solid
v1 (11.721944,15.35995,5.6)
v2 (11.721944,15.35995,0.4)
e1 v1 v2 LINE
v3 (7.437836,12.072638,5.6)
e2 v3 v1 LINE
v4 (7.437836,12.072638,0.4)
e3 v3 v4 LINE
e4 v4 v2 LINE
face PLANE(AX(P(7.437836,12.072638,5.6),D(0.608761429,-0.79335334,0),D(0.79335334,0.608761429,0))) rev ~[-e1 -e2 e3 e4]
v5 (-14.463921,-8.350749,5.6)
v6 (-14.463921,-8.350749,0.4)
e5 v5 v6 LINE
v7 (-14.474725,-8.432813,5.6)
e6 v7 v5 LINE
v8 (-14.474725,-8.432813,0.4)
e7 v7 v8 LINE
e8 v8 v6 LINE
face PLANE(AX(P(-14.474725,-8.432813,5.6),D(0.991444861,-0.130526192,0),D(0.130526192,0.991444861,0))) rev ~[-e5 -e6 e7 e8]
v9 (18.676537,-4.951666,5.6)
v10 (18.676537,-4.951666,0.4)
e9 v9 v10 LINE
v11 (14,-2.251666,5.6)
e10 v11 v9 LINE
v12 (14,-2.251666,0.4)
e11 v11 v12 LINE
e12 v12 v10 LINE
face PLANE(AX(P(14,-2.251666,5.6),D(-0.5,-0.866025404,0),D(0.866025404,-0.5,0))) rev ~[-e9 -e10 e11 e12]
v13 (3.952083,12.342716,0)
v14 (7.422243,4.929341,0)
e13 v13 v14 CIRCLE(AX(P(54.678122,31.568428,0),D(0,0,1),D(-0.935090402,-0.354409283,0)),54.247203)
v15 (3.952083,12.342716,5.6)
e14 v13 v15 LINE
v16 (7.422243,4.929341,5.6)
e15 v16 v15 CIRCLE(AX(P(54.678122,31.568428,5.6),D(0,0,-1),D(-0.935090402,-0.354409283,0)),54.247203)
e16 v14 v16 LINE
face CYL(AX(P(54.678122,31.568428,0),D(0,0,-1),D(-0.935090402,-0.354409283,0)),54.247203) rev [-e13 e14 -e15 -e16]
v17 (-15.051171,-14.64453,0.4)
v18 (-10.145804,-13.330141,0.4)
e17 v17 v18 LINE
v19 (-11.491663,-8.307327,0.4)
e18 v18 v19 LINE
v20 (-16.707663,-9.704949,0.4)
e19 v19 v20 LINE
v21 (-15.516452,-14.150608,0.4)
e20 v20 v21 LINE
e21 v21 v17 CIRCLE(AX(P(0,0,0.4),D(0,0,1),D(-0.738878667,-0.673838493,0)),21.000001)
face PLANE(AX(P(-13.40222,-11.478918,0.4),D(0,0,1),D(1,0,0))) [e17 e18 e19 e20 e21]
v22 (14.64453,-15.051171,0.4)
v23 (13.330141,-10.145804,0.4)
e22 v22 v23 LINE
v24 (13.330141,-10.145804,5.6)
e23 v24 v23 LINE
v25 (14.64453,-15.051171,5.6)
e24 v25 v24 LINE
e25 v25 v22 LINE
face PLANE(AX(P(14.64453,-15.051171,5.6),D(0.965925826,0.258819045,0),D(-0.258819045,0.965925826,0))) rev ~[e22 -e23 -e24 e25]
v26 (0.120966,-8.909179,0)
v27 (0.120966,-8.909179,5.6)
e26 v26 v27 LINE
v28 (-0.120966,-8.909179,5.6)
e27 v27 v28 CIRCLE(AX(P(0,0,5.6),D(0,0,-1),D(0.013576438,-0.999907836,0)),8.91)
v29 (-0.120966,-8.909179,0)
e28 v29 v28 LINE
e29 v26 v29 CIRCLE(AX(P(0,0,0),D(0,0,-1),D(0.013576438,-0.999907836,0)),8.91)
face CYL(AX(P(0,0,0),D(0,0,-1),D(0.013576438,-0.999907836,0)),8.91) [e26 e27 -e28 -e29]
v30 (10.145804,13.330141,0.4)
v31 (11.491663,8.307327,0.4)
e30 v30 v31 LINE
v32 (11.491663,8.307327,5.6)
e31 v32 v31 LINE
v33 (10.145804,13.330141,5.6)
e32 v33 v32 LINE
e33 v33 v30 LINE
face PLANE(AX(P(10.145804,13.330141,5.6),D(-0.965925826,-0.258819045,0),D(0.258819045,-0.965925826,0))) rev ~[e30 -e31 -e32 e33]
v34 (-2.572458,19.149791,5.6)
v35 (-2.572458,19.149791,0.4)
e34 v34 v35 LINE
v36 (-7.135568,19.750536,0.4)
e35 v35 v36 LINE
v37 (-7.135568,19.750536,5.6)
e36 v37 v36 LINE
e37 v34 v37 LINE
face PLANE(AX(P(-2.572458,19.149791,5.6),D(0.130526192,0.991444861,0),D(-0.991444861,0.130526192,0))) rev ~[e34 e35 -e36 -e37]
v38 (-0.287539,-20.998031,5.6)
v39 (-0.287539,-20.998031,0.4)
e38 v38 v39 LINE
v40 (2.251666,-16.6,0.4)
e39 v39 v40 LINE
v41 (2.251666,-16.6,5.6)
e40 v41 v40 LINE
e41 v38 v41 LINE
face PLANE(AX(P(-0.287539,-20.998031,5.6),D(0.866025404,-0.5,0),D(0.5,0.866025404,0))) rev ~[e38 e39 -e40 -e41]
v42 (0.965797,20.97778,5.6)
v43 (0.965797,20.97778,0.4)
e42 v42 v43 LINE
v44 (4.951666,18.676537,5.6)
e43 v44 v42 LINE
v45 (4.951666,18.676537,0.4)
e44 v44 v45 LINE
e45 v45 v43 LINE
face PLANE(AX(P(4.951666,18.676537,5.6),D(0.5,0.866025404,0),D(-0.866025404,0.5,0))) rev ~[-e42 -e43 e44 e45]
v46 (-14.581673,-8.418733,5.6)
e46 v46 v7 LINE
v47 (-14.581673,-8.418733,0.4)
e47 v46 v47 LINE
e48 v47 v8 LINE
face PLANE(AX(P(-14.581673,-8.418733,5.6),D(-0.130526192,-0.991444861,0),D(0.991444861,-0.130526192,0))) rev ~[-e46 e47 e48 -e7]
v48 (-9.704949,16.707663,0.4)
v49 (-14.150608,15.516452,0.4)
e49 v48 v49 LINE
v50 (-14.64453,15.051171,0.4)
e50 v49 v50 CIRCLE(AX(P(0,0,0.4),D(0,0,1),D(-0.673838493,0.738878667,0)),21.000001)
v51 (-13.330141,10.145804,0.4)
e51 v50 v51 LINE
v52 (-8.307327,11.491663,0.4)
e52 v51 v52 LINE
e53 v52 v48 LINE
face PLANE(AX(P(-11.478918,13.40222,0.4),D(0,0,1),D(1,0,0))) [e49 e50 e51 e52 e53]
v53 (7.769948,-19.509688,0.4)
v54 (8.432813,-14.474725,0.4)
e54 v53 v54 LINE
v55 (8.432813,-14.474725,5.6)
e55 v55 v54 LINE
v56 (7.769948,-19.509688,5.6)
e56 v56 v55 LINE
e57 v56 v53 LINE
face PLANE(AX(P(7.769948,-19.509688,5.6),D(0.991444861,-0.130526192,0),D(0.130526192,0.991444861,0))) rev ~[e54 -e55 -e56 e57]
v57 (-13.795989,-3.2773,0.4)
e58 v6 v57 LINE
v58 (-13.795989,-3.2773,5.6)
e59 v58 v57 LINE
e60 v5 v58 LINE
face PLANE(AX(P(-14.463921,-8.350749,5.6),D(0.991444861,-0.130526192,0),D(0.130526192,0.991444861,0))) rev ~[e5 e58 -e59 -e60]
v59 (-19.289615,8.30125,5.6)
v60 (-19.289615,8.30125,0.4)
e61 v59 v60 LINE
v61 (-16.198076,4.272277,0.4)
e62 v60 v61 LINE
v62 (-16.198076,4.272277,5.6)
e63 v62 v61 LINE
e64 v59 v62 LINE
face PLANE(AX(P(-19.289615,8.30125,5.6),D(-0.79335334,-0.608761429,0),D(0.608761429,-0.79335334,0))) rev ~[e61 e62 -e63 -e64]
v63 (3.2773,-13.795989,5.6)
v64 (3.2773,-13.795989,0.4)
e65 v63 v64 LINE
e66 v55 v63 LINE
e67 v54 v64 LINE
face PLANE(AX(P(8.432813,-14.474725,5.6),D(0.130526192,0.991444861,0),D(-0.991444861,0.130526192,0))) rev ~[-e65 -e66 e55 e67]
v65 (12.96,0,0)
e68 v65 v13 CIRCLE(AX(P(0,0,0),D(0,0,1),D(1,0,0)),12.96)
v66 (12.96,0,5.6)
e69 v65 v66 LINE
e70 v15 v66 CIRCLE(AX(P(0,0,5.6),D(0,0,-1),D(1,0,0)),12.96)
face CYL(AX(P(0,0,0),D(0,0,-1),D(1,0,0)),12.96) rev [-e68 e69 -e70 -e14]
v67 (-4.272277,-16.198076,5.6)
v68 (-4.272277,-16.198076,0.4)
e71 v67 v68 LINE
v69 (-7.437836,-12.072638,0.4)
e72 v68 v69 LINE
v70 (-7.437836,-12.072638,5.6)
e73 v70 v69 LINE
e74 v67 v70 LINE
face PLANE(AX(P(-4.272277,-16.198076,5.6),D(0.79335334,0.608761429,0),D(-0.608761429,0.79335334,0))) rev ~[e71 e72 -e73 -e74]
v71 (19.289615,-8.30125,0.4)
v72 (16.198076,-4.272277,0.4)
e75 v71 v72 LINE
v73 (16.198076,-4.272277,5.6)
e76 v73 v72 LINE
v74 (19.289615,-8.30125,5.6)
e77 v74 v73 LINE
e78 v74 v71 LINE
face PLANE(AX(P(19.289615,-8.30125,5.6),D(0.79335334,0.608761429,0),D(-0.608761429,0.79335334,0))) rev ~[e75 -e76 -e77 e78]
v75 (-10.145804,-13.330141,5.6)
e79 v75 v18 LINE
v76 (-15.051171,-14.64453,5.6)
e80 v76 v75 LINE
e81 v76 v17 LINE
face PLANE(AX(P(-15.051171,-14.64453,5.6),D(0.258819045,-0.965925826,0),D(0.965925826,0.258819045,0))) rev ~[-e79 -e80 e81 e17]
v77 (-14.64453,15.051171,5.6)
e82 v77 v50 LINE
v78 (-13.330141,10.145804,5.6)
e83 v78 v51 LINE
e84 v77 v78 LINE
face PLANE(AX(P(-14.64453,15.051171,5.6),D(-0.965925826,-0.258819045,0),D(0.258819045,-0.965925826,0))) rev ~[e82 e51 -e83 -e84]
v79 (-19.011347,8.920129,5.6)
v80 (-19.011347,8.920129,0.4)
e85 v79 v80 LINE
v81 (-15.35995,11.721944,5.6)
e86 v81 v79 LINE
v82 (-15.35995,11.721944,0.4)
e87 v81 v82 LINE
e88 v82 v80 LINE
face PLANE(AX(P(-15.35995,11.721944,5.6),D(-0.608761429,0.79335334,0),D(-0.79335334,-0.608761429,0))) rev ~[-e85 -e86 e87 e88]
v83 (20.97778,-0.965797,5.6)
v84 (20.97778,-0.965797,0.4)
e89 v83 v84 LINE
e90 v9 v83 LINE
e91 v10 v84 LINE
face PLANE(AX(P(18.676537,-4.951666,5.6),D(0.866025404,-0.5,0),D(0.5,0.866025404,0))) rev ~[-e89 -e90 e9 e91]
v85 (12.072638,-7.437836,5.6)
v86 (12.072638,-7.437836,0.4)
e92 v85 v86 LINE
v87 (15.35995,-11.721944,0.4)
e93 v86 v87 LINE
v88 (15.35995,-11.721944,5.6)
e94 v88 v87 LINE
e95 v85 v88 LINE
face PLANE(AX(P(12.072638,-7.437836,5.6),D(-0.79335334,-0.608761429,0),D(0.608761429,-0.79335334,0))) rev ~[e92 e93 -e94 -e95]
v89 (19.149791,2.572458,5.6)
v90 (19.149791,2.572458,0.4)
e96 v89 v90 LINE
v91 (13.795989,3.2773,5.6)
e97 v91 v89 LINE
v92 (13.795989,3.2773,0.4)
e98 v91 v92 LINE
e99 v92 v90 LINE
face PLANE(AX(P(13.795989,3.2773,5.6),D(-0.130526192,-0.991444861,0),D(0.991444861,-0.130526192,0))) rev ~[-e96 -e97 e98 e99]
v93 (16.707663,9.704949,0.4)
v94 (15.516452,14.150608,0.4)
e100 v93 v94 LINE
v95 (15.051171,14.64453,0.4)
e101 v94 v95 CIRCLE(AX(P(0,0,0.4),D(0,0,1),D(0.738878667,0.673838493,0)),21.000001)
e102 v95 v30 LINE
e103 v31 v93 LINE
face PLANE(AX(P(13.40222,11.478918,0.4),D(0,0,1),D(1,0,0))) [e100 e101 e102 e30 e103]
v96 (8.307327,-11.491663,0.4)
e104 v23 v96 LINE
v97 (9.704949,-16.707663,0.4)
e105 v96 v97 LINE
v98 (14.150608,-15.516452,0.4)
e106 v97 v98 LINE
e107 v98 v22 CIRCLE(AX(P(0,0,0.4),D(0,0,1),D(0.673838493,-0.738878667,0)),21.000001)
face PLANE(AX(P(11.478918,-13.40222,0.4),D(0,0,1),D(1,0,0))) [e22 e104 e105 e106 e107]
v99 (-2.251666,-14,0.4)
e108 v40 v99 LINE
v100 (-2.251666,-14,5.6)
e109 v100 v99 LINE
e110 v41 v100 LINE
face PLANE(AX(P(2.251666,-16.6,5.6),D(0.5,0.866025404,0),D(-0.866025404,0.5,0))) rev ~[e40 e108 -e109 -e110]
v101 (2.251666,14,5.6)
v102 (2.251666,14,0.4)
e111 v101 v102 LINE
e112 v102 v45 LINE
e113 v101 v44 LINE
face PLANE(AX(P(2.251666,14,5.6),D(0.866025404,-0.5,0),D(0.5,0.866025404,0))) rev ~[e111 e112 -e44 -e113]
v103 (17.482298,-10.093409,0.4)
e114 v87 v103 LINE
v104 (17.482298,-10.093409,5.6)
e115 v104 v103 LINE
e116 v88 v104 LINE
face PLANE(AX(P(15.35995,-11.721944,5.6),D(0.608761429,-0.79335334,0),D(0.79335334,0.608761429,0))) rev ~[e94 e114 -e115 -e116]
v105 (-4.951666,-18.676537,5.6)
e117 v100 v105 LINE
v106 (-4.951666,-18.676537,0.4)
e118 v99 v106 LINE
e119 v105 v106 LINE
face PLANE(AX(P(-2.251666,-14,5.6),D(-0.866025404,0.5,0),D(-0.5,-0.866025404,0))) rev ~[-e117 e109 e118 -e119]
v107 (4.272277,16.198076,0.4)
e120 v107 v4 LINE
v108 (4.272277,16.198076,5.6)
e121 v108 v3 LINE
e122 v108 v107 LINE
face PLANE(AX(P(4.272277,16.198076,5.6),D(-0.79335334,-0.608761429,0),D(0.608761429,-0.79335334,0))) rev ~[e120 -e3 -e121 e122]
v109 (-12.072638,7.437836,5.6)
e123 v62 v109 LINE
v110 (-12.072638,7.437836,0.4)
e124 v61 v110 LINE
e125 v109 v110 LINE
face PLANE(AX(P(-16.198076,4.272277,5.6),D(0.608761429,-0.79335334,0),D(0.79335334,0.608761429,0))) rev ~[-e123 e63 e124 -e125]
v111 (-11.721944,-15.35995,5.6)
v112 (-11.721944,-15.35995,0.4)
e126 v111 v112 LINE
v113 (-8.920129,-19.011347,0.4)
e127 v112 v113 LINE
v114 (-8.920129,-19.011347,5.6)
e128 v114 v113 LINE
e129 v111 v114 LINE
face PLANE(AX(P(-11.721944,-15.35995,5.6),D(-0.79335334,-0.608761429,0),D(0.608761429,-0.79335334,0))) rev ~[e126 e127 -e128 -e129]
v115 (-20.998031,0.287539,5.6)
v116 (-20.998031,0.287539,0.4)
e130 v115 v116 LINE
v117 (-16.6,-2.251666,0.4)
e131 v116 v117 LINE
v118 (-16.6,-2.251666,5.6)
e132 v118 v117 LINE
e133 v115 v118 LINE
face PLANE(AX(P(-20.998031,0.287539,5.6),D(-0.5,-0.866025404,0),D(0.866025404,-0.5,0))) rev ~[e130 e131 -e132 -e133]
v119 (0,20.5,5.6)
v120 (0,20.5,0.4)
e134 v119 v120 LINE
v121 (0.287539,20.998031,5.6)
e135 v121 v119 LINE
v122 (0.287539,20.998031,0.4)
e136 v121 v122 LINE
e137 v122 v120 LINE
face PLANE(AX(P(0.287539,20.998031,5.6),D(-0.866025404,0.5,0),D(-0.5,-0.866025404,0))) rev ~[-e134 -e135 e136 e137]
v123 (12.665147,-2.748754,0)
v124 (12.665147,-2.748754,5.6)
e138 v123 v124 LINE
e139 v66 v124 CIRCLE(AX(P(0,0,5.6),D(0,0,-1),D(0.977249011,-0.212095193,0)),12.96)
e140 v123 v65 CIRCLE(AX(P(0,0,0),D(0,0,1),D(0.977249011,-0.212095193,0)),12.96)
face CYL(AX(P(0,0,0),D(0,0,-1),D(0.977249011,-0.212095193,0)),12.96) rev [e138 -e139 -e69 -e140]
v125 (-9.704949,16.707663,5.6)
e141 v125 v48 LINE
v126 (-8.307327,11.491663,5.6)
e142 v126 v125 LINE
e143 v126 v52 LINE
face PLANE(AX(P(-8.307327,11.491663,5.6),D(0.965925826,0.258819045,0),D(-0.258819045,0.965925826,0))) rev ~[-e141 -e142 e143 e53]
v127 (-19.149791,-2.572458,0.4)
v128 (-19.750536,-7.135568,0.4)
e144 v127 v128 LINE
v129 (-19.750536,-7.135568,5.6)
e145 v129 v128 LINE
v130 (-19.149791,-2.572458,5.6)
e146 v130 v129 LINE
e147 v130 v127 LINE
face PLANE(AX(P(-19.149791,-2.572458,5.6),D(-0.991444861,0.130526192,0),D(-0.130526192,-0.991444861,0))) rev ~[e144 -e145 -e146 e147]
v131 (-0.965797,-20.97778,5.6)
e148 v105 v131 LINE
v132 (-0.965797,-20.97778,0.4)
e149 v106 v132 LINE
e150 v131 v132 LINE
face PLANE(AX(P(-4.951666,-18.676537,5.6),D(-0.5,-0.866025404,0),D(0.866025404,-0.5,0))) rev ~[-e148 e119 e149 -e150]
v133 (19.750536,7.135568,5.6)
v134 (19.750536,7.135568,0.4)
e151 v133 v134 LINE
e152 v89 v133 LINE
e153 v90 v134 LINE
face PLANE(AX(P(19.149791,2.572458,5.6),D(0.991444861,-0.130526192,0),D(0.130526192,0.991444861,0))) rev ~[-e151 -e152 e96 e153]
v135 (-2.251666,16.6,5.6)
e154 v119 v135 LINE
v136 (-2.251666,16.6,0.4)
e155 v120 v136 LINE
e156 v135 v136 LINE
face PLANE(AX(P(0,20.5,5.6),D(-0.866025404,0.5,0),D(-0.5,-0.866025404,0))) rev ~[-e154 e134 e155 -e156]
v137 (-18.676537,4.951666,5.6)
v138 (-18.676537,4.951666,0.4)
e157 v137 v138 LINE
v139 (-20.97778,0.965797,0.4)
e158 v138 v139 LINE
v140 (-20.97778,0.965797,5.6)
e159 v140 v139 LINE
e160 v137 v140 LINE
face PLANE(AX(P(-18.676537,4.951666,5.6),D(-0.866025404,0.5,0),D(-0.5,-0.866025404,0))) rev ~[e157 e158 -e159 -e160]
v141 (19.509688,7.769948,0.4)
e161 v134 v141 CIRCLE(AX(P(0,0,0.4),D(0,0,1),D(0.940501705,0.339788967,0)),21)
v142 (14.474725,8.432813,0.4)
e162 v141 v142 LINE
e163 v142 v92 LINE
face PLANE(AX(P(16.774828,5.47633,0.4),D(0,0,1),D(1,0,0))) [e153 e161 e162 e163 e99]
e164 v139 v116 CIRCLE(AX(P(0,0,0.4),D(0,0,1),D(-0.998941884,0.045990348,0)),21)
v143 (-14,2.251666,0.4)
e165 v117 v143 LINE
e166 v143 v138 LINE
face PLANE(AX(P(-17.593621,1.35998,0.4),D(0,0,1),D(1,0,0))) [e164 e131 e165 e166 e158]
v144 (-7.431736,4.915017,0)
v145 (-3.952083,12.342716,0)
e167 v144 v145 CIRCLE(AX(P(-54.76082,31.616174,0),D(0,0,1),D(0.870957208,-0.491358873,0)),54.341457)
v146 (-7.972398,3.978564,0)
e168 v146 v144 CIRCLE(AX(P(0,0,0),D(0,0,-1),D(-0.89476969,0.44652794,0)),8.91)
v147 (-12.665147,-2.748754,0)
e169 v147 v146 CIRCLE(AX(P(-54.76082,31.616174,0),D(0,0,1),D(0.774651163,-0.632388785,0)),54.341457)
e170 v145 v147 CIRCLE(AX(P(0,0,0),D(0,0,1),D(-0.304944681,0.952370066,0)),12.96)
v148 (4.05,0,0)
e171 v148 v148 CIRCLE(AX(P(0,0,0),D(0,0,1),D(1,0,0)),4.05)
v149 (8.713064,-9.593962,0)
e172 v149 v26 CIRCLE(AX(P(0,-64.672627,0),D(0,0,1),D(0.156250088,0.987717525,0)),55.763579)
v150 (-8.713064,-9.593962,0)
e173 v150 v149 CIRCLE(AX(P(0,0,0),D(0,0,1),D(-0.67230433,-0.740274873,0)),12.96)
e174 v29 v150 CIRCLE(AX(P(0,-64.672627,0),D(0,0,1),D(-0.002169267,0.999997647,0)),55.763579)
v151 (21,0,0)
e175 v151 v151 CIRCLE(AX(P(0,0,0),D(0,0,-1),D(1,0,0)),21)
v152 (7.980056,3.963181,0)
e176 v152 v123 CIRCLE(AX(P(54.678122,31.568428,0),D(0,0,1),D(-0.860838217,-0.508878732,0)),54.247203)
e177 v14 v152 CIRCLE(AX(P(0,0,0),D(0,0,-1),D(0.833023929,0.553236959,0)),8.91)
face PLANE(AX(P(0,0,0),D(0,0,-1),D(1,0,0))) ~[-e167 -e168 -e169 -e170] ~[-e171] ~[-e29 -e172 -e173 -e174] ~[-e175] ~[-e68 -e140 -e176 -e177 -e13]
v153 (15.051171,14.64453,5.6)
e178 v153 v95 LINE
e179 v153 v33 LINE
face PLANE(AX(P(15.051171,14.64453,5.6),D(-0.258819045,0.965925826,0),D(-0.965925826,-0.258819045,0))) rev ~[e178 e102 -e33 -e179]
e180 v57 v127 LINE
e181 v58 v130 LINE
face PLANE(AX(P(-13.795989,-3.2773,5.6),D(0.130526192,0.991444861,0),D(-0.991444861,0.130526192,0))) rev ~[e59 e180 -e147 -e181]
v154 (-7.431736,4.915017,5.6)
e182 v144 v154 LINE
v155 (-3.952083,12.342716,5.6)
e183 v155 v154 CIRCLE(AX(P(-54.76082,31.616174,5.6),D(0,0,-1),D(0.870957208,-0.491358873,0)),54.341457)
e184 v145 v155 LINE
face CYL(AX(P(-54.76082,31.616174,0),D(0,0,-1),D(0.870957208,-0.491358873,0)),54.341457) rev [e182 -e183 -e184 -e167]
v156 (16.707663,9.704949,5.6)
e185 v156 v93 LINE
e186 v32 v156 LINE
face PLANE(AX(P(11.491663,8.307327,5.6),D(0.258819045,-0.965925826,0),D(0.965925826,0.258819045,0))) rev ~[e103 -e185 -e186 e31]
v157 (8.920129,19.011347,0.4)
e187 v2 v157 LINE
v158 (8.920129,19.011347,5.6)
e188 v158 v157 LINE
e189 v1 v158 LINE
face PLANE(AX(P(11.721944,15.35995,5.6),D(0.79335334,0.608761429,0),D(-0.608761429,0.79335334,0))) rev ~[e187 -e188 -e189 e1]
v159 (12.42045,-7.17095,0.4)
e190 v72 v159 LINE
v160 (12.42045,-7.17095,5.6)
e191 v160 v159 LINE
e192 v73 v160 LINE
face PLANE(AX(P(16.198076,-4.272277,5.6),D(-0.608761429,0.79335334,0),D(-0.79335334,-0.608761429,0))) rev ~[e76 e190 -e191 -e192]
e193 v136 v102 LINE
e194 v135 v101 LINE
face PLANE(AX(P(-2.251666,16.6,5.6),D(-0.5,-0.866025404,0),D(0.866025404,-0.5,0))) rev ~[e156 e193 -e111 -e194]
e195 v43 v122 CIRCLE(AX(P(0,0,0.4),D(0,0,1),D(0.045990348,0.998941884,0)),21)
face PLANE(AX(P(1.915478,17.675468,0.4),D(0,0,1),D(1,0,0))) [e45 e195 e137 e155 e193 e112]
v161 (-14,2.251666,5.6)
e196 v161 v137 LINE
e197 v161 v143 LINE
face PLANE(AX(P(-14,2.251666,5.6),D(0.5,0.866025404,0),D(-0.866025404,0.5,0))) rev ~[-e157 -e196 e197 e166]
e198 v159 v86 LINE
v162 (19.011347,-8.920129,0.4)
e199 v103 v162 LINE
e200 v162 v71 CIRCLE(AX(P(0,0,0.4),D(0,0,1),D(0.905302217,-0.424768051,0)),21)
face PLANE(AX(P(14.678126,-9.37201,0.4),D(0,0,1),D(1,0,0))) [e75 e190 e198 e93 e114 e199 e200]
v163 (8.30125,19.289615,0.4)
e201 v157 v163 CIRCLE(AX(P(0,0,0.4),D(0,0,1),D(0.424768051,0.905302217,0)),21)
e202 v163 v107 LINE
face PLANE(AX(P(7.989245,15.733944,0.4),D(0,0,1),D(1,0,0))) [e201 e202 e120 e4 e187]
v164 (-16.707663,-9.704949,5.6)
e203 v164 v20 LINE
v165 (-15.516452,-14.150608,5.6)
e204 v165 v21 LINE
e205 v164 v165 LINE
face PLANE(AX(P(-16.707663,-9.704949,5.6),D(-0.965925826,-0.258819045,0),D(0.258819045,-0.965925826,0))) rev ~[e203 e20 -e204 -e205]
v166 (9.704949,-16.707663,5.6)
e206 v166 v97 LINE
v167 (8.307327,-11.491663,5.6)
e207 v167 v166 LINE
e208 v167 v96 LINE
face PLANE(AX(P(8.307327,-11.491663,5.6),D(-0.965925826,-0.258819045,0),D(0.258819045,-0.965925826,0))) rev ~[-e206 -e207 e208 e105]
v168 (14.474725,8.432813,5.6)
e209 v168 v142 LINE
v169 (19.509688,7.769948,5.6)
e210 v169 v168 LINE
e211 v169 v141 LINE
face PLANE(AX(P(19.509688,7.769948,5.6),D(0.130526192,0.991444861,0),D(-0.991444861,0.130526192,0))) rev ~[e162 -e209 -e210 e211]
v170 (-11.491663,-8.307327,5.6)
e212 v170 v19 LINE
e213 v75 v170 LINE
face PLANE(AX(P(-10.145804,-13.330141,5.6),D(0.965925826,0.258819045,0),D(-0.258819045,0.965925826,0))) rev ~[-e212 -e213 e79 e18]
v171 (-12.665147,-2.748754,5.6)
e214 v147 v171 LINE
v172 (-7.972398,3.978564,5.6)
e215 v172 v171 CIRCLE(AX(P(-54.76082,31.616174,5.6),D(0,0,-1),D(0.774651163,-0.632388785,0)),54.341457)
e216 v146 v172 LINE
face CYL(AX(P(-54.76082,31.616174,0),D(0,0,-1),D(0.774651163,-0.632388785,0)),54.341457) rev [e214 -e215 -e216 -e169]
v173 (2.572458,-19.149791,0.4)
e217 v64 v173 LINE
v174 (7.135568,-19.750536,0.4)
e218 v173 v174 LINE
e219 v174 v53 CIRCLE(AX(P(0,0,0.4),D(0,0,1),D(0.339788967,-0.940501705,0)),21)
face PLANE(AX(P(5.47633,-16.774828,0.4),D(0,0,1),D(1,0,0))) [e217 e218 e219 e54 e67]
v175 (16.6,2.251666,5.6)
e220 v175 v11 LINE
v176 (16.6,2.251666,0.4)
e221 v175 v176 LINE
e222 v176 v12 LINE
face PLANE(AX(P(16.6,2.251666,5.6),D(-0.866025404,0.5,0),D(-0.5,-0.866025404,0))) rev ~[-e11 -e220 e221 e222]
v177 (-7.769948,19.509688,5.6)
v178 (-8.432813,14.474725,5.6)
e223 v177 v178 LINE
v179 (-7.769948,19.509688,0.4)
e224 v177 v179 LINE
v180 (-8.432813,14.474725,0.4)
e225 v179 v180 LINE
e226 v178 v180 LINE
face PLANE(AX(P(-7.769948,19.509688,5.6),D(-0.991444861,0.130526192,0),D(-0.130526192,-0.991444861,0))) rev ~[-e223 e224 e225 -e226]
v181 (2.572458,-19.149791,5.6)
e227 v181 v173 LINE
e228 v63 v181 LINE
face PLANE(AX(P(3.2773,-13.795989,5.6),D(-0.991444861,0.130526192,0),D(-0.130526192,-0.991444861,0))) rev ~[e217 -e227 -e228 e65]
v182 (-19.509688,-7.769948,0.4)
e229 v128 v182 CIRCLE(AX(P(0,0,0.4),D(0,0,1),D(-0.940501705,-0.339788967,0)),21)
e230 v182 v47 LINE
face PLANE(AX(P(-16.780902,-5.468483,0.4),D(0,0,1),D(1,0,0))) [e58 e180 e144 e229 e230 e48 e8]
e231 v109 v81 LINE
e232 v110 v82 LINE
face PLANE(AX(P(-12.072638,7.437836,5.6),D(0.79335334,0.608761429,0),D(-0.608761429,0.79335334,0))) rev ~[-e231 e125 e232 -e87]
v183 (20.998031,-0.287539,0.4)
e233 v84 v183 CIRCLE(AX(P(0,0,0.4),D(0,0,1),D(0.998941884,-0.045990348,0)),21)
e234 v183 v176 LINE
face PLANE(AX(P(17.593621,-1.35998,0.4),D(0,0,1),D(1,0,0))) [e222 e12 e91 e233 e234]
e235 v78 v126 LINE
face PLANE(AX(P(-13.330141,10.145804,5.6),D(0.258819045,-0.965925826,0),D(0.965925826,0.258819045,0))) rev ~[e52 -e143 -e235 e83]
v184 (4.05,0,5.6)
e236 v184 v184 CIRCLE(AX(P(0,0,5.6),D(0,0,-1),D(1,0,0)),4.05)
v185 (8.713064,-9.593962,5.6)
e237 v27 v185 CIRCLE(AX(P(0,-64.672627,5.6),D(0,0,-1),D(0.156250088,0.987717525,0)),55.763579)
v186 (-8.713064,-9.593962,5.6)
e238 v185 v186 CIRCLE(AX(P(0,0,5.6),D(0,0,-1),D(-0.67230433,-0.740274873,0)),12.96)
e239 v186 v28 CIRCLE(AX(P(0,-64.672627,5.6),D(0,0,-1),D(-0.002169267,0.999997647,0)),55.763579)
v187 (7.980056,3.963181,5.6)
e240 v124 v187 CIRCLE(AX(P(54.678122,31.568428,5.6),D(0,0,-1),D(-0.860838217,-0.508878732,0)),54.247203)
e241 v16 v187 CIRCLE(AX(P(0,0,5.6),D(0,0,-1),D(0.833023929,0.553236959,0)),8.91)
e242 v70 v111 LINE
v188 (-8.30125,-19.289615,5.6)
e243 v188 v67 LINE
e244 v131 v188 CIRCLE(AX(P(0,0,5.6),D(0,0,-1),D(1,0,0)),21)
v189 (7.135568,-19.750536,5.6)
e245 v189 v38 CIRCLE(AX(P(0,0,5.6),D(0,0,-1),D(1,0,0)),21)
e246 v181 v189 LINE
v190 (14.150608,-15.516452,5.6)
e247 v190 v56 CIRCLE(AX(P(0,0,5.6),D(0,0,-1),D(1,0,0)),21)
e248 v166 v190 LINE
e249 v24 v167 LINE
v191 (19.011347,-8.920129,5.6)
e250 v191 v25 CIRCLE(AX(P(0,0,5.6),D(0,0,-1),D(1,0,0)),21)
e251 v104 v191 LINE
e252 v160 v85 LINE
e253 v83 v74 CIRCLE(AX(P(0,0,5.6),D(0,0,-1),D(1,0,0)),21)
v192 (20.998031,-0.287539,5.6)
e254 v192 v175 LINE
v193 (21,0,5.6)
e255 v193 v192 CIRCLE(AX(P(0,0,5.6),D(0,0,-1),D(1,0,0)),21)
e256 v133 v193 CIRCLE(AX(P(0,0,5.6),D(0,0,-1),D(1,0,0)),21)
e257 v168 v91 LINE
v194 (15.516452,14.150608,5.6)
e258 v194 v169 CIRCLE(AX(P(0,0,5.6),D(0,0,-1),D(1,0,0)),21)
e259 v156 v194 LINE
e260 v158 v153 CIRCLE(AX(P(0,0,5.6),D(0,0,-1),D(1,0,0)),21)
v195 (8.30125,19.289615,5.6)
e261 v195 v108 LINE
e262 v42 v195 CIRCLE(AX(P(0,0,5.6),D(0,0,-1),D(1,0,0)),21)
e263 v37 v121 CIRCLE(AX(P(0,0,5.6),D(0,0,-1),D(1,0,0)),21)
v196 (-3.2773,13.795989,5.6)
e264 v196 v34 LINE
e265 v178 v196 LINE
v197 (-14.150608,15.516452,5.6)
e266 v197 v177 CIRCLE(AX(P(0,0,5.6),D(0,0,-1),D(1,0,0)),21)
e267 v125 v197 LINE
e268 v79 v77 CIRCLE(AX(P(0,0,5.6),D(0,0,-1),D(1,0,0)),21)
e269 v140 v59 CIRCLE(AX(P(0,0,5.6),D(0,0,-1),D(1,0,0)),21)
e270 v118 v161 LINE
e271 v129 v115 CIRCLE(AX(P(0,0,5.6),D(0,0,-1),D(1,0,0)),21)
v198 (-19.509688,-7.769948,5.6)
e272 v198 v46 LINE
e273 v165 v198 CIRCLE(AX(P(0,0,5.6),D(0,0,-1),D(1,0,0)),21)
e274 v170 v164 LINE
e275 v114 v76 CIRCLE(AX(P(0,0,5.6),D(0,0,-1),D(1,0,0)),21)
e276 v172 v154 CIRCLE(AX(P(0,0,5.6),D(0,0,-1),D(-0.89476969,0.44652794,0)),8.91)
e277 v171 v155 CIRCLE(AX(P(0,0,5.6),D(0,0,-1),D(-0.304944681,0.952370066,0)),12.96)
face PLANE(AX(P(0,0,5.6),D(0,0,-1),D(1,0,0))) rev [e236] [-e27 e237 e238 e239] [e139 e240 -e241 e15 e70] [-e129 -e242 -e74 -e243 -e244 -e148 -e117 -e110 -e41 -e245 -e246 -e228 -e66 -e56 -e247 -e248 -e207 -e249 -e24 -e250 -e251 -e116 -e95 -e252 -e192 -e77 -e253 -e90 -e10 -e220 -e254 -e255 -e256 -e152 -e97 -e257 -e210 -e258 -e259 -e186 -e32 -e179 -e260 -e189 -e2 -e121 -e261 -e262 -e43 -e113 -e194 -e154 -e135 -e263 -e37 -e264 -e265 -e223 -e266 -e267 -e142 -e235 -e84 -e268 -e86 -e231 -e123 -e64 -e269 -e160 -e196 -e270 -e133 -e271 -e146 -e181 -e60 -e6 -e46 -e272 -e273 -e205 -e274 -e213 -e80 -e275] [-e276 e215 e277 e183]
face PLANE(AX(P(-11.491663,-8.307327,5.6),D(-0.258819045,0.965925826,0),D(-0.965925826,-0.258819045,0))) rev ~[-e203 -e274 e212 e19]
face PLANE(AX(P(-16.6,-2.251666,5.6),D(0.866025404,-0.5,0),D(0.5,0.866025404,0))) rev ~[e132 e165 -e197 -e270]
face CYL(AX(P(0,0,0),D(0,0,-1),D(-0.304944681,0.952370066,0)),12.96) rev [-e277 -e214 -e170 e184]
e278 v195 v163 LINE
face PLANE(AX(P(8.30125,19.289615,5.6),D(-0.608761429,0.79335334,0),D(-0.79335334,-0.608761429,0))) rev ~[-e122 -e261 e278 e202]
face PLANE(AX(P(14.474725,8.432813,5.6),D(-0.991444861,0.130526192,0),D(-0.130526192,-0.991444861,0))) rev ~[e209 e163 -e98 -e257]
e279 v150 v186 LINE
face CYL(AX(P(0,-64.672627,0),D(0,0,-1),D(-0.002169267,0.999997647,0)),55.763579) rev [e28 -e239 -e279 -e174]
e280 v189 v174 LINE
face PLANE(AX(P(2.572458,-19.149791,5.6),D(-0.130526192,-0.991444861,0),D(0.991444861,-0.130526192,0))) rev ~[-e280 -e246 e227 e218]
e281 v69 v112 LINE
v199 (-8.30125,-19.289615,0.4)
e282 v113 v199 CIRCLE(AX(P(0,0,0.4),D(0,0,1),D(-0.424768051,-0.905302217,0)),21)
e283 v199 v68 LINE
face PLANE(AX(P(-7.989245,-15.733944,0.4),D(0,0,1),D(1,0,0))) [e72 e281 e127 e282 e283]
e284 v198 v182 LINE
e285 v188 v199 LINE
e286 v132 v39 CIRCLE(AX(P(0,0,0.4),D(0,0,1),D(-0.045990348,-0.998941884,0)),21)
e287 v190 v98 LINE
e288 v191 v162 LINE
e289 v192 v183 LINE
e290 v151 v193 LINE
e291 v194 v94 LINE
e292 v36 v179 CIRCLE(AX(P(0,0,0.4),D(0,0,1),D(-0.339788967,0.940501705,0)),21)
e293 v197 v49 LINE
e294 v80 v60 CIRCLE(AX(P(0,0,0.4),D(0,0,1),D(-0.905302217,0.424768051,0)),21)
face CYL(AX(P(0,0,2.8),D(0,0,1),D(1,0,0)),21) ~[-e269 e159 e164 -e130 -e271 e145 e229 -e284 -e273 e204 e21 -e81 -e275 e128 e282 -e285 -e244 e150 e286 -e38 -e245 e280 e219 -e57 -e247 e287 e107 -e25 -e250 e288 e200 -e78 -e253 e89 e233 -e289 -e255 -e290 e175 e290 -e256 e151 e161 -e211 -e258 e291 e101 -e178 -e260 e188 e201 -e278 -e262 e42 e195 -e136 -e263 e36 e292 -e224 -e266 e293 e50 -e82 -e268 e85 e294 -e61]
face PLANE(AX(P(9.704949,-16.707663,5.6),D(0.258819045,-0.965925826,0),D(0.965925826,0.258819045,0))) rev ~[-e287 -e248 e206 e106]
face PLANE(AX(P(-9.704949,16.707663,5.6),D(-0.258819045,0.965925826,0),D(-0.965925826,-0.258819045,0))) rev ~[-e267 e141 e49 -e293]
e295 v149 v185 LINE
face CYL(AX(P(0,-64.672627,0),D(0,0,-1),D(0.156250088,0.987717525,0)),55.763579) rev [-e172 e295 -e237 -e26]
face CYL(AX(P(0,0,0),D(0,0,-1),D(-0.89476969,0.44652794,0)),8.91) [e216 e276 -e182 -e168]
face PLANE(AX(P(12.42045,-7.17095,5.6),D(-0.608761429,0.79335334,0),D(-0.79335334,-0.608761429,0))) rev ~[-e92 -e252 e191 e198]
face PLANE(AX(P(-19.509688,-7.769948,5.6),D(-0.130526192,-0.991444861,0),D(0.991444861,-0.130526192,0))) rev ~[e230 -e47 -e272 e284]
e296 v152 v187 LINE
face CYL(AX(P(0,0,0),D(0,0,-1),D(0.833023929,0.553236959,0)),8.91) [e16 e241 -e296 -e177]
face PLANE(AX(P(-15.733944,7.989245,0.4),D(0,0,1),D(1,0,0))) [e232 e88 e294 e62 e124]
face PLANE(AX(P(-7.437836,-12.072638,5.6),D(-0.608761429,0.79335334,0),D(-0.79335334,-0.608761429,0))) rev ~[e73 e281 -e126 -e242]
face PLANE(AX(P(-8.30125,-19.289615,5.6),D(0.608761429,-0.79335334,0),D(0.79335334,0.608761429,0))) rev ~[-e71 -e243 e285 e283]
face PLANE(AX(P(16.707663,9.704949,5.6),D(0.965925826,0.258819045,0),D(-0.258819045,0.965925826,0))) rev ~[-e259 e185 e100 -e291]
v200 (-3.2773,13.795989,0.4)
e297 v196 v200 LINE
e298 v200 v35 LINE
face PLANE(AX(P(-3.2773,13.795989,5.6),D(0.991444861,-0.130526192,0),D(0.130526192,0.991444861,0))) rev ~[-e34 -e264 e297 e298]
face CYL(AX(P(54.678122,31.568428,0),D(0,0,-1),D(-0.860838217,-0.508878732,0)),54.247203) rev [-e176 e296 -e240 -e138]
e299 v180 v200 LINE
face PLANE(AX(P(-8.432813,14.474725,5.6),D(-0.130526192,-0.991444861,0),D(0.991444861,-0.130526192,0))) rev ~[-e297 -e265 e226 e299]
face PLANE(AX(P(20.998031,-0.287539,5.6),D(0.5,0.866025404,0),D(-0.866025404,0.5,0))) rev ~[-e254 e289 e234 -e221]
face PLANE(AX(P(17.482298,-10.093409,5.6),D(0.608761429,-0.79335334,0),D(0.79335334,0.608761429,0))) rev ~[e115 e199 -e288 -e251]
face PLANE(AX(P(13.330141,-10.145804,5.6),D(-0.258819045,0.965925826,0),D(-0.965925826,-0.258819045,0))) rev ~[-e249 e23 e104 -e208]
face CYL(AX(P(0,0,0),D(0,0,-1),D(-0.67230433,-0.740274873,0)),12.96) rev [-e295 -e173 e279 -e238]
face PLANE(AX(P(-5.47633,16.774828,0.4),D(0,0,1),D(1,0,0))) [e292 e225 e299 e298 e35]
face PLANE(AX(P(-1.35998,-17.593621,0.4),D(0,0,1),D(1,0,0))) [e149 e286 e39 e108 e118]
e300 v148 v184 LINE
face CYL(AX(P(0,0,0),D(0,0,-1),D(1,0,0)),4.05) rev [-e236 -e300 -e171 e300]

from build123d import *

# Parameters (mm, degrees)
F0_W     = 21
F0_H     = 5.6
F2_R     = 4.05
F3_DEPTH = 25
F5_DEPTH = 5.2


# Not quite as in the source:
# - a feature names something its author has since deleted; it is built from what else it names


with BuildPart() as f1:
    # F0 (on Front) → F1 (revolve)
    with BuildSketch(Plane.XZ):
        with Locations((10.5, 2.8)):
            Rectangle(F0_W, F0_H)
    revolve(axis=Axis((0, 0, 2.8), (0, 0, -1)))

    # F2 (on Top) → F3 (cut)
    with BuildSketch(Plane.XY):
        with BuildLine():
            ThreePointArc((7.42224321, 4.929341308), (7.7162863477, 4.455), (7.9800564017, 3.963180519))
            ThreePointArc((7.9800564017, 3.963180519), (10.1958256536, 0.5187206321), (12.6651471812, -2.7487536956))
            ThreePointArc((12.6651471812, -2.7487536956), (12.8860759634, -1.3822612872), (12.96, 0))
            ThreePointArc((12.96, 0), (10.4685384958, 7.640111371), (3.9520830614, 12.3427160494))
            ThreePointArc((3.9520830614, 12.3427160494), (5.5471380717, 8.5704837125), (7.42224321, 4.929341308))
        make_face()
        with BuildLine():
            ThreePointArc((8.7130641198, -9.5939623537), (4.4302657319, -9.0853125174), (0.1209660663, -8.909178818))
            ThreePointArc((0.1209660663, -8.909178818), (0, -8.91), (-0.1209660663, -8.909178818))
            ThreePointArc((-0.1209660663, -8.909178818), (-4.4302657319, -9.0853125174), (-8.7130641198, -9.5939623537))
            ThreePointArc((-8.7130641198, -9.5939623537), (0, -12.96), (8.7130641198, -9.5939623537))
        make_face()
        with BuildLine():
            ThreePointArc((-7.9723979418, 3.9785639441), (-7.7162863477, 4.455), (-7.4317364171, 4.9150171746))
            ThreePointArc((-7.4317364171, 4.9150171746), (-5.551566481, 8.5631200197), (-3.9520830614, 12.3427160494))
            ThreePointArc((-3.9520830614, 12.3427160494), (-11.223689233, 6.48), (-12.6651471812, -2.7487536956))
            ThreePointArc((-12.6651471812, -2.7487536956), (-10.1916627132, 0.5262375935), (-7.9723979418, 3.9785639441))
        make_face()
        Circle(F2_R)
    extrude(amount=F3_DEPTH, mode=Mode.SUBTRACT)

    # F4 (on face) → F5 (cut)
    with BuildSketch(Plane.XY.offset(5.6)):
        with BuildLine():
            Line((0, 15.3), (2.2516660498, 14))
            Line((2.2516660498, 14), (4.9516660498, 18.6765371804))
            Line((4.9516660498, 18.6765371804), (0.9657973165, 20.9777795666))
            ThreePointArc((0.9657973165, 20.9777795666), (0.6267497357, 20.9906451728), (0.2875385478, 20.998031374))
            Line((0.2875385478, 20.998031374), (0, 20.5))
            Line((0, 20.5), (0, 15.7))
            Line((0, 15.7), (0, 15.3))
        make_face()
        Polygon((-2.2516660498, 16.6), (0, 15.3), (0, 15.7), (0, 20.5), align=None)
        with BuildLine():
            ThreePointArc((8.9201290612, 19.011346547), (8.6118133951, 19.1529807092), (8.3012496983, 19.289615171))
            Line((8.3012496983, 19.289615171), (4.2722767998, 16.1980755322))
            Line((4.2722767998, 16.1980755322), (7.4378362306, 12.0726381627))
            Line((7.4378362306, 12.0726381627), (11.7219442682, 15.3599498793))
            Line((11.7219442682, 15.3599498793), (8.9201290612, 19.011346547))
        make_face()
        with BuildLine():
            ThreePointArc((15.5164520175, 14.150608354), (15.2858065313, 14.3994485549), (15.0511708332, 14.6445299191))
            Line((15.0511708332, 14.6445299191), (10.1458042349, 13.3301409005))
            Line((10.1458042349, 13.3301409005), (11.4916632694, 8.3073266038))
            Line((11.4916632694, 8.3073266038), (16.7076627314, 9.7049494474))
            Line((16.7076627314, 9.7049494474), (15.5164520175, 14.150608354))
        make_face()
        with BuildLine():
            ThreePointArc((19.7505358111, 7.1355683146), (19.6326741894, 7.4537308895), (19.5096876479, 7.76994774))
            Line((19.5096876479, 7.76994774), (14.4747249472, 8.4328131548))
            Line((14.4747249472, 8.4328131548), (13.7959887477, 3.2772998756))
            Line((13.7959887477, 3.2772998756), (19.1497909991, 2.5724584376))
            Line((19.1497909991, 2.5724584376), (19.7505358111, 7.1355683146))
        make_face()
        with BuildLine():
            Line((18.6765371804, -4.9516660498), (20.9777795666, -0.9657973165))
            ThreePointArc((20.9777795666, -0.9657973165), (20.9906451728, -0.6267497357), (20.998031374, -0.2875385478))
            Line((20.998031374, -0.2875385478), (16.6, 2.2516660498))
            Line((16.6, 2.2516660498), (14, -2.2516660498))
            Line((14, -2.2516660498), (18.6765371804, -4.9516660498))
        make_face()
        Polygon((17.4822978668, -10.0934093795), (12.4204504984, -7.1709504387), (12.0726381627, -7.4378362306), (15.3599498793, -11.7219442682), align=None)
        with BuildLine():
            ThreePointArc((14.150608354, -15.5164520175), (14.3994485549, -15.2858065313), (14.6445299191, -15.0511708332))
            Line((14.6445299191, -15.0511708332), (13.3301409005, -10.1458042349))
            Line((13.3301409005, -10.1458042349), (8.3073266038, -11.4916632694))
            Line((8.3073266038, -11.4916632694), (9.7049494474, -16.7076627314))
            Line((9.7049494474, -16.7076627314), (14.150608354, -15.5164520175))
        make_face()
        with BuildLine():
            ThreePointArc((7.1355683146, -19.7505358111), (7.4537308895, -19.6326741894), (7.76994774, -19.5096876479))
            Line((7.76994774, -19.5096876479), (8.4328131548, -14.4747249472))
            Line((8.4328131548, -14.4747249472), (3.2772998756, -13.7959887477))
            Line((3.2772998756, -13.7959887477), (2.5724584376, -19.1497909991))
            Line((2.5724584376, -19.1497909991), (7.1355683146, -19.7505358111))
        make_face()
        with BuildLine():
            Line((-4.9516660498, -18.6765371804), (-0.9657973165, -20.9777795666))
            ThreePointArc((-0.9657973165, -20.9777795666), (-0.6267497357, -20.9906451728), (-0.2875385478, -20.998031374))
            Line((-0.2875385478, -20.998031374), (2.2516660498, -16.6))
            Line((2.2516660498, -16.6), (-2.2516660498, -14))
            Line((-2.2516660498, -14), (-4.9516660498, -18.6765371804))
        make_face()
        with BuildLine():
            Line((-11.7219442682, -15.3599498793), (-8.9201290612, -19.011346547))
            ThreePointArc((-8.9201290612, -19.011346547), (-8.6118133951, -19.1529807092), (-8.3012496983, -19.289615171))
            Line((-8.3012496983, -19.289615171), (-4.2722767998, -16.1980755322))
            Line((-4.2722767998, -16.1980755322), (-7.4378362306, -12.0726381627))
            Line((-7.4378362306, -12.0726381627), (-11.7219442682, -15.3599498793))
        make_face()
        with BuildLine():
            Line((-16.7076627314, -9.7049494474), (-15.5164520175, -14.150608354))
            ThreePointArc((-15.5164520175, -14.150608354), (-15.2858065313, -14.3994485549), (-15.0511708332, -14.6445299191))
            Line((-15.0511708332, -14.6445299191), (-10.1458042349, -13.3301409005))
            Line((-10.1458042349, -13.3301409005), (-11.4916632694, -8.3073266038))
            Line((-11.4916632694, -8.3073266038), (-16.7076627314, -9.7049494474))
        make_face()
        with BuildLine():
            ThreePointArc((-20.9777795666, 0.9657973165), (-20.9906451728, 0.6267497357), (-20.998031374, 0.2875385478))
            Line((-20.998031374, 0.2875385478), (-16.6, -2.2516660498))
            Line((-16.6, -2.2516660498), (-14, 2.2516660498))
            Line((-14, 2.2516660498), (-18.6765371804, 4.9516660498))
            Line((-18.6765371804, 4.9516660498), (-20.9777795666, 0.9657973165))
        make_face()
        with BuildLine():
            Line((-15.3599498793, 11.7219442682), (-19.011346547, 8.9201290612))
            ThreePointArc((-19.011346547, 8.9201290612), (-19.1529807092, 8.6118133951), (-19.289615171, 8.3012496983))
            Line((-19.289615171, 8.3012496983), (-16.1980755322, 4.2722767998))
            Line((-16.1980755322, 4.2722767998), (-12.0726381627, 7.4378362306))
            Line((-12.0726381627, 7.4378362306), (-15.3599498793, 11.7219442682))
        make_face()
        with BuildLine():
            Line((-9.7049494474, 16.7076627314), (-14.150608354, 15.5164520175))
            ThreePointArc((-14.150608354, 15.5164520175), (-14.3994485549, 15.2858065313), (-14.6445299191, 15.0511708332))
            Line((-14.6445299191, 15.0511708332), (-13.3301409005, 10.1458042349))
            Line((-13.3301409005, 10.1458042349), (-8.3073266038, 11.4916632694))
            Line((-8.3073266038, 11.4916632694), (-9.7049494474, 16.7076627314))
        make_face()
        with BuildLine():
            Line((-2.5724584376, 19.1497909991), (-7.1355683146, 19.7505358111))
            ThreePointArc((-7.1355683146, 19.7505358111), (-7.4537308895, 19.6326741894), (-7.76994774, 19.5096876479))
            Line((-7.76994774, 19.5096876479), (-8.4328131548, 14.4747249472))
            Line((-8.4328131548, 14.4747249472), (-3.2772998756, 13.7959887477))
            Line((-3.2772998756, 13.7959887477), (-2.5724584376, 19.1497909991))
        make_face()
        with BuildLine():
            Line((-14.5816734862, -8.4187331125), (-14.4639209508, -8.3507486545))
            Line((-14.4639209508, -8.3507486545), (-13.7959887477, -3.2772998756))
            Line((-13.7959887477, -3.2772998756), (-19.1497909991, -2.5724584376))
            Line((-19.1497909991, -2.5724584376), (-19.7505358111, -7.1355683146))
            ThreePointArc((-19.7505358111, -7.1355683146), (-19.6326741894, -7.4537308895), (-19.5096876479, -7.76994774))
            Line((-19.5096876479, -7.76994774), (-14.5816734862, -8.4187331125))
        make_face()
        Polygon((-14.4747249472, -8.4328131548), (-14.4639209508, -8.3507486545), (-14.5816734862, -8.4187331125), align=None)
        with BuildLine():
            Line((16.1980755322, -4.2722767998), (12.4204504984, -7.1709504387))
            Line((12.4204504984, -7.1709504387), (17.4822978668, -10.0934093795))
            Line((17.4822978668, -10.0934093795), (19.011346547, -8.9201290612))
            ThreePointArc((19.011346547, -8.9201290612), (19.1529807092, -8.6118133951), (19.289615171, -8.3012496983))
            Line((19.289615171, -8.3012496983), (16.1980755322, -4.2722767998))
        make_face()
    extrude(amount=-F5_DEPTH, mode=Mode.SUBTRACT)


solid = f1.part
